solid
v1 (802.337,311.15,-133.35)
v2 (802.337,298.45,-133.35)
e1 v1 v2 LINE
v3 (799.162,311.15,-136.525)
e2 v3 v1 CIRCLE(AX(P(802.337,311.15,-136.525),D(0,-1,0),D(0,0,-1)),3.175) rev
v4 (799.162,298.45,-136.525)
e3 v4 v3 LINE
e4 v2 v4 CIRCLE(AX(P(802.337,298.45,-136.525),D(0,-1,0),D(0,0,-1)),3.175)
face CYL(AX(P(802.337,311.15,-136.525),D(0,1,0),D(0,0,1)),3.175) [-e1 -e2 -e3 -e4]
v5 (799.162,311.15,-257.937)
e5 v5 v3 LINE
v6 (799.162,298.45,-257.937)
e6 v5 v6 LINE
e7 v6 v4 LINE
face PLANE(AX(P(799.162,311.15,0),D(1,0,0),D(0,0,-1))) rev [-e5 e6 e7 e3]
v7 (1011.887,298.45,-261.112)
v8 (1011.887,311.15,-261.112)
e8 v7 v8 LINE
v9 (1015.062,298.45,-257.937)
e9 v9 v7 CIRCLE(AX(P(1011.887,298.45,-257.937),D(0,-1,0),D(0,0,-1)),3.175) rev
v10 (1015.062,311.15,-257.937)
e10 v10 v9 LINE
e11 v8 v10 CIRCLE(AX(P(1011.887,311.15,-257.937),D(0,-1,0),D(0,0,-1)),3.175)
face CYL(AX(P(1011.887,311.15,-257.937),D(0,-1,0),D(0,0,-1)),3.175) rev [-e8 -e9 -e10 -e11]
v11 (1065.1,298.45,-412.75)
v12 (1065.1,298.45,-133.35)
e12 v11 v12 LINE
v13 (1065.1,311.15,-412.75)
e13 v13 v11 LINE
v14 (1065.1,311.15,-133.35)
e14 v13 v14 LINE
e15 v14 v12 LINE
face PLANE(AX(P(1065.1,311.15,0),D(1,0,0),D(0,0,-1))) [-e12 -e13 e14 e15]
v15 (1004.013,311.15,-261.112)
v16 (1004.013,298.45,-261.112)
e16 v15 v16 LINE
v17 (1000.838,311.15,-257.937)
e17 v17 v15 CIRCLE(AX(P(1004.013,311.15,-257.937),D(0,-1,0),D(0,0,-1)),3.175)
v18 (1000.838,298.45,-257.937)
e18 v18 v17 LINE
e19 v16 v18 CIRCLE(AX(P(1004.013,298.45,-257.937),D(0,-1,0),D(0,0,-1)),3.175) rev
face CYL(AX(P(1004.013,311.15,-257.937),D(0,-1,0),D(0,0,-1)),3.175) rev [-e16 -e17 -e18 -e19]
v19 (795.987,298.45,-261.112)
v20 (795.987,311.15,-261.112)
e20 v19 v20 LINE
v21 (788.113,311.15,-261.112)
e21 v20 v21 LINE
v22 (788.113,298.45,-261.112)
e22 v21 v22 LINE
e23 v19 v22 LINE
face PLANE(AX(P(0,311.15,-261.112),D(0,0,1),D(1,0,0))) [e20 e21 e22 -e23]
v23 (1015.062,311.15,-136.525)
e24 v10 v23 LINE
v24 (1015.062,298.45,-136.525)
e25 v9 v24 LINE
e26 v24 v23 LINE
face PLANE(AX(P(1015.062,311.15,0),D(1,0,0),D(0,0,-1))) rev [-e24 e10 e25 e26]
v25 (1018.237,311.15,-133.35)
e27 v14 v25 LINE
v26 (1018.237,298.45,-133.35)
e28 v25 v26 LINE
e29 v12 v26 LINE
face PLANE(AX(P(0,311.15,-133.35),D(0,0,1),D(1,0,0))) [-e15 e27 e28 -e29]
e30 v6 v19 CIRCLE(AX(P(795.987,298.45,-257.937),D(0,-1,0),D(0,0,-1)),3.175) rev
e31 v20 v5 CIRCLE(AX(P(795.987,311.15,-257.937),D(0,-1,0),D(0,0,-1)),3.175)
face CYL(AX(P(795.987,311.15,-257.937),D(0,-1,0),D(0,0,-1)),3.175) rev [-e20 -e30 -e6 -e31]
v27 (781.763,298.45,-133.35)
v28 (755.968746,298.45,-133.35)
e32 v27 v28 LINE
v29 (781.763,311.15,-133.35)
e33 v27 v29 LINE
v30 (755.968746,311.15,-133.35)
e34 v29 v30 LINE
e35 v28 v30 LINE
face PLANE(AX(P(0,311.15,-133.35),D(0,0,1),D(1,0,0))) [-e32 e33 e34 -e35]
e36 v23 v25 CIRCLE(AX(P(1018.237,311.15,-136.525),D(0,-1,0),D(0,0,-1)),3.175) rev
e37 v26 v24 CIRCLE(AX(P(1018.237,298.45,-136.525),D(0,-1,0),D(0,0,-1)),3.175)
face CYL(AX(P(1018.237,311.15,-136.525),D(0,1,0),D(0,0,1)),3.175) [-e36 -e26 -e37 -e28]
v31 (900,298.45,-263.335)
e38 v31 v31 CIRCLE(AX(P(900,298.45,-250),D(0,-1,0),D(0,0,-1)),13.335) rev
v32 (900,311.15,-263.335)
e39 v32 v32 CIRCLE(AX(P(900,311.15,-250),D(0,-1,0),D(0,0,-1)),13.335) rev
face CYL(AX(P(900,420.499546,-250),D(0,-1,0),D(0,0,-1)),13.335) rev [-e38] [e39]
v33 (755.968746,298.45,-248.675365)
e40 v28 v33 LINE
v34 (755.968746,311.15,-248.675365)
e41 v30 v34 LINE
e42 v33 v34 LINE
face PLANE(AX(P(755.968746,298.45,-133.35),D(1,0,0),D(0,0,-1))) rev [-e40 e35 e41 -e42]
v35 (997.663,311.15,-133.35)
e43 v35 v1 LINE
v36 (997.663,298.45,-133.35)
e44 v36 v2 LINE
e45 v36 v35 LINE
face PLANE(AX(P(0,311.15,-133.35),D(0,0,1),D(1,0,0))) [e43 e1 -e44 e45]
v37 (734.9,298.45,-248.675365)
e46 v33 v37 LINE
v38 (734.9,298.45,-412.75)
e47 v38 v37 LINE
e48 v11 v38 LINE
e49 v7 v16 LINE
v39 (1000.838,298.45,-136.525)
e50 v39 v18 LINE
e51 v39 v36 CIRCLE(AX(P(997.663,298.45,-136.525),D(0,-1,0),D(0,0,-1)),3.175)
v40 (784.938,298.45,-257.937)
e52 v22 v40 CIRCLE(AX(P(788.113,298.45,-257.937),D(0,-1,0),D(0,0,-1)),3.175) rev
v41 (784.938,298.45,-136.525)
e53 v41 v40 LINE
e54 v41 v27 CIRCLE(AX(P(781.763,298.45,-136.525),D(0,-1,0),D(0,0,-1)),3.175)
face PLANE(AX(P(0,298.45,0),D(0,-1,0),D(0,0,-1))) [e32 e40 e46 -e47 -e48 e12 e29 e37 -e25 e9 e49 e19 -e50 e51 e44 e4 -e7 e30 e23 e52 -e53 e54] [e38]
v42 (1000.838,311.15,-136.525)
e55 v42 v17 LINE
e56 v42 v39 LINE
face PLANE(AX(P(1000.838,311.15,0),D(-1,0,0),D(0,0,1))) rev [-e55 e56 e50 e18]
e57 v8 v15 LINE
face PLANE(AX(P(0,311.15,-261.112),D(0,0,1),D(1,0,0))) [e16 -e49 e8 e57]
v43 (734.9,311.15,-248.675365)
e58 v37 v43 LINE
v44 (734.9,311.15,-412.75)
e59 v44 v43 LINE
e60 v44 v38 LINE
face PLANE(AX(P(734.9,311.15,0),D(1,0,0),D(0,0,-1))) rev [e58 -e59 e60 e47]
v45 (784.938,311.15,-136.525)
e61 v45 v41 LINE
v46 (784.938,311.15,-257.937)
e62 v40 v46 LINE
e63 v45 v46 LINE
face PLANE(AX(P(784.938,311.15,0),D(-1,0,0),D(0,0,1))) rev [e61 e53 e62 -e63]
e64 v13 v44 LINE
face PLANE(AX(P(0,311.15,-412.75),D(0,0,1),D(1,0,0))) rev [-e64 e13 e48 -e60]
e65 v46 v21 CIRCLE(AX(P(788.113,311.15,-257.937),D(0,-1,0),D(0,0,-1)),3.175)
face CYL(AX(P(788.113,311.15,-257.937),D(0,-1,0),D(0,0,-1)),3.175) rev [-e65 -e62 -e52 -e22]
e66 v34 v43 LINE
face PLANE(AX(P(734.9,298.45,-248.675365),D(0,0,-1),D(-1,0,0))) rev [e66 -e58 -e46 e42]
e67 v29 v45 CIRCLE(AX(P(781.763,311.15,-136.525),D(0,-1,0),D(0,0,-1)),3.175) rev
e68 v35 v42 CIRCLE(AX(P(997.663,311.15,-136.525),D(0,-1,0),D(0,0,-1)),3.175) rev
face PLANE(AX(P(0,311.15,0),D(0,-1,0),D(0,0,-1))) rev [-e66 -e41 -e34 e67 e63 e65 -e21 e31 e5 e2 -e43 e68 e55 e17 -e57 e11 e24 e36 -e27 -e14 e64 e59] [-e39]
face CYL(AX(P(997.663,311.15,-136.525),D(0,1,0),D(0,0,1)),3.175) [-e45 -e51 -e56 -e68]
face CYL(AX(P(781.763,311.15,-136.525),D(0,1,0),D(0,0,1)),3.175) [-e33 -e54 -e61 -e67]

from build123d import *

# Parameters (mm, degrees)
BOSS_EXTRUDE1_DEPTH  = 12.7
CAVITY1_START        = 298.45
CAVITY1_OUTLINE_R    = 12.7
CAVITY1_DEPTH        = 12.7
CAVITY1_START_2      = 720.91620239
CAVITY1_2_DEPTH      = 22.43918751
SKETCH2_W            = 21.068746236
SKETCH2_H            = 115.32536453
CUT_EXTRUDE1_DEPTH   = 1143.349273427
MOVE_FACE_SLOTS_BY   = 0.762
MOVE_FACE_SLOTS_2_BY = 0.762
MOVE_FACE_SLOTS_3_BY = 0.762
MOVE_FACE_SLOTS_4_BY = 0.762
MOVE_FACE_SLOTS_5_BY = 0.762
MOVE_FACE_SLOTS_6_BY = 0.762
MOVE_FACE_HOLES_BY   = 0.635
SLOT_FILLETS_R       = 3.175


# Read off the part's stored shape, not the designer's step: Cavity1
with BuildPart() as part:
    # Sketch1 → Boss-Extrude1 (new body)
    with BuildSketch(Plane(origin=(0, 298.45, 0), x_dir=(-1, 0, 0), z_dir=(0, -1, 0))):
        Polygon((-798.4, 260.35), (-798.4, 133.35), (-1001.6, 133.35), (-1001.6, 260.35), (-1014.3, 260.35), (-1014.3, 133.35), (-1065.1, 133.35), (-1065.1, 412.75), (-1014.3, 412.75), (-1001.6, 412.75), (-798.4, 412.75), (-785.7, 412.75), (-734.9, 412.75), (-734.9, 133.35), (-785.7, 133.35), (-785.7, 260.35), align=None)
    extrude(amount=-BOSS_EXTRUDE1_DEPTH)

    # Cavity1 outline → Cavity1 (cut)
    with BuildSketch(Plane(origin=(0, 0, 0), x_dir=(1, 0, 0), z_dir=(0, 1, 0)).offset(CAVITY1_START)):
        with Locations((900, 250)):
            Circle(CAVITY1_OUTLINE_R)
    extrude(amount=CAVITY1_DEPTH, mode=Mode.SUBTRACT)

    # Cavity1 2 outline → Cavity1 2 (cut)
    with BuildSketch(Plane(origin=(0, 0, 0), x_dir=(0.7149295353100682, -0.6987525164445135, -0.024913456279483565), z_dir=(0.6991965099607762, 0.7144755512387232, 0.02547404837855681)).offset(CAVITY1_START_2)):
        with BuildLine():
            ThreePointArc((313.444242413, 230.081087528), (327.146171675, 242.424687318), (314.076314529, 255.435688643))
            Line((314.076314529, 255.435688643), (312, 255.374549574))
            Line((312, 255.374549574), (312, 230.195835843))
            Line((312, 230.195835843), (313.444242413, 230.081087528))
        make_face()
    extrude(amount=CAVITY1_2_DEPTH, mode=Mode.SUBTRACT)

    # Sketch2 → Cut-Extrude1 (cut, through all)
    with BuildSketch(Plane(origin=(0, 311.15, 0), x_dir=(1, 0, 0), z_dir=(0, 1, 0))):
        with Locations((745.434373118, 191.012682265)):
            Rectangle(SKETCH2_W, SKETCH2_H)
    extrude(amount=-CUT_EXTRUDE1_DEPTH, mode=Mode.SUBTRACT)

    # Move Face Slots: a face moved inward by 0.762
    extrude(part.faces().sort_by_distance((1001.6, 304.8, -196.85))[0], amount=MOVE_FACE_SLOTS_BY, dir=(-1, 0, 0), mode=Mode.SUBTRACT)

    # Move Face Slots 2: a face moved inward by 0.762
    extrude(part.faces().sort_by_distance((785.7, 304.8, -196.85))[0], amount=MOVE_FACE_SLOTS_2_BY, dir=(-1, 0, 0), mode=Mode.SUBTRACT)

    # Move Face Slots 3: a face moved inward by 0.762
    extrude(part.faces().sort_by_distance((1014.3, 304.8, -196.85))[0], amount=MOVE_FACE_SLOTS_3_BY, dir=(1, 0, 0), mode=Mode.SUBTRACT)

    # Move Face Slots 4: a face moved inward by 0.762
    extrude(part.faces().sort_by_distance((1007.95, 304.8, -260.35))[0], amount=MOVE_FACE_SLOTS_4_BY, dir=(0, 0, -1), mode=Mode.SUBTRACT)

    # Move Face Slots 5: a face moved inward by 0.762
    extrude(part.faces().sort_by_distance((798.4, 304.8, -196.85))[0], amount=MOVE_FACE_SLOTS_5_BY, dir=(1, 0, 0), mode=Mode.SUBTRACT)

    # Move Face Slots 6: a face moved inward by 0.762
    extrude(part.faces().sort_by_distance((792.05, 304.8, -260.35))[0], amount=MOVE_FACE_SLOTS_6_BY, dir=(0, 0, -1), mode=Mode.SUBTRACT)

    # Move Face Holes: a curved face moved inward by 0.635
    add(Solid.thicken(part.faces().sort_by_distance((887.3, 304.8, -250))[0], -MOVE_FACE_HOLES_BY), mode=Mode.SUBTRACT)

    # Slot Fillets
    slot_fillets_edges = [part.edges().sort_by_distance(p)[0] for p in [
        (799.162, 304.8, -261.112),
        (799.162, 304.8, -133.35),
        (1000.838, 304.8, -133.35),
        (1000.838, 304.8, -261.112),
        (1015.062, 304.8, -261.112),
        (1015.062, 304.8, -133.35),
        (784.938, 304.8, -133.35),
        (784.938, 304.8, -261.112),
    ]]
    fillet(slot_fillets_edges, radius=SLOT_FILLETS_R)


solid = part.part
